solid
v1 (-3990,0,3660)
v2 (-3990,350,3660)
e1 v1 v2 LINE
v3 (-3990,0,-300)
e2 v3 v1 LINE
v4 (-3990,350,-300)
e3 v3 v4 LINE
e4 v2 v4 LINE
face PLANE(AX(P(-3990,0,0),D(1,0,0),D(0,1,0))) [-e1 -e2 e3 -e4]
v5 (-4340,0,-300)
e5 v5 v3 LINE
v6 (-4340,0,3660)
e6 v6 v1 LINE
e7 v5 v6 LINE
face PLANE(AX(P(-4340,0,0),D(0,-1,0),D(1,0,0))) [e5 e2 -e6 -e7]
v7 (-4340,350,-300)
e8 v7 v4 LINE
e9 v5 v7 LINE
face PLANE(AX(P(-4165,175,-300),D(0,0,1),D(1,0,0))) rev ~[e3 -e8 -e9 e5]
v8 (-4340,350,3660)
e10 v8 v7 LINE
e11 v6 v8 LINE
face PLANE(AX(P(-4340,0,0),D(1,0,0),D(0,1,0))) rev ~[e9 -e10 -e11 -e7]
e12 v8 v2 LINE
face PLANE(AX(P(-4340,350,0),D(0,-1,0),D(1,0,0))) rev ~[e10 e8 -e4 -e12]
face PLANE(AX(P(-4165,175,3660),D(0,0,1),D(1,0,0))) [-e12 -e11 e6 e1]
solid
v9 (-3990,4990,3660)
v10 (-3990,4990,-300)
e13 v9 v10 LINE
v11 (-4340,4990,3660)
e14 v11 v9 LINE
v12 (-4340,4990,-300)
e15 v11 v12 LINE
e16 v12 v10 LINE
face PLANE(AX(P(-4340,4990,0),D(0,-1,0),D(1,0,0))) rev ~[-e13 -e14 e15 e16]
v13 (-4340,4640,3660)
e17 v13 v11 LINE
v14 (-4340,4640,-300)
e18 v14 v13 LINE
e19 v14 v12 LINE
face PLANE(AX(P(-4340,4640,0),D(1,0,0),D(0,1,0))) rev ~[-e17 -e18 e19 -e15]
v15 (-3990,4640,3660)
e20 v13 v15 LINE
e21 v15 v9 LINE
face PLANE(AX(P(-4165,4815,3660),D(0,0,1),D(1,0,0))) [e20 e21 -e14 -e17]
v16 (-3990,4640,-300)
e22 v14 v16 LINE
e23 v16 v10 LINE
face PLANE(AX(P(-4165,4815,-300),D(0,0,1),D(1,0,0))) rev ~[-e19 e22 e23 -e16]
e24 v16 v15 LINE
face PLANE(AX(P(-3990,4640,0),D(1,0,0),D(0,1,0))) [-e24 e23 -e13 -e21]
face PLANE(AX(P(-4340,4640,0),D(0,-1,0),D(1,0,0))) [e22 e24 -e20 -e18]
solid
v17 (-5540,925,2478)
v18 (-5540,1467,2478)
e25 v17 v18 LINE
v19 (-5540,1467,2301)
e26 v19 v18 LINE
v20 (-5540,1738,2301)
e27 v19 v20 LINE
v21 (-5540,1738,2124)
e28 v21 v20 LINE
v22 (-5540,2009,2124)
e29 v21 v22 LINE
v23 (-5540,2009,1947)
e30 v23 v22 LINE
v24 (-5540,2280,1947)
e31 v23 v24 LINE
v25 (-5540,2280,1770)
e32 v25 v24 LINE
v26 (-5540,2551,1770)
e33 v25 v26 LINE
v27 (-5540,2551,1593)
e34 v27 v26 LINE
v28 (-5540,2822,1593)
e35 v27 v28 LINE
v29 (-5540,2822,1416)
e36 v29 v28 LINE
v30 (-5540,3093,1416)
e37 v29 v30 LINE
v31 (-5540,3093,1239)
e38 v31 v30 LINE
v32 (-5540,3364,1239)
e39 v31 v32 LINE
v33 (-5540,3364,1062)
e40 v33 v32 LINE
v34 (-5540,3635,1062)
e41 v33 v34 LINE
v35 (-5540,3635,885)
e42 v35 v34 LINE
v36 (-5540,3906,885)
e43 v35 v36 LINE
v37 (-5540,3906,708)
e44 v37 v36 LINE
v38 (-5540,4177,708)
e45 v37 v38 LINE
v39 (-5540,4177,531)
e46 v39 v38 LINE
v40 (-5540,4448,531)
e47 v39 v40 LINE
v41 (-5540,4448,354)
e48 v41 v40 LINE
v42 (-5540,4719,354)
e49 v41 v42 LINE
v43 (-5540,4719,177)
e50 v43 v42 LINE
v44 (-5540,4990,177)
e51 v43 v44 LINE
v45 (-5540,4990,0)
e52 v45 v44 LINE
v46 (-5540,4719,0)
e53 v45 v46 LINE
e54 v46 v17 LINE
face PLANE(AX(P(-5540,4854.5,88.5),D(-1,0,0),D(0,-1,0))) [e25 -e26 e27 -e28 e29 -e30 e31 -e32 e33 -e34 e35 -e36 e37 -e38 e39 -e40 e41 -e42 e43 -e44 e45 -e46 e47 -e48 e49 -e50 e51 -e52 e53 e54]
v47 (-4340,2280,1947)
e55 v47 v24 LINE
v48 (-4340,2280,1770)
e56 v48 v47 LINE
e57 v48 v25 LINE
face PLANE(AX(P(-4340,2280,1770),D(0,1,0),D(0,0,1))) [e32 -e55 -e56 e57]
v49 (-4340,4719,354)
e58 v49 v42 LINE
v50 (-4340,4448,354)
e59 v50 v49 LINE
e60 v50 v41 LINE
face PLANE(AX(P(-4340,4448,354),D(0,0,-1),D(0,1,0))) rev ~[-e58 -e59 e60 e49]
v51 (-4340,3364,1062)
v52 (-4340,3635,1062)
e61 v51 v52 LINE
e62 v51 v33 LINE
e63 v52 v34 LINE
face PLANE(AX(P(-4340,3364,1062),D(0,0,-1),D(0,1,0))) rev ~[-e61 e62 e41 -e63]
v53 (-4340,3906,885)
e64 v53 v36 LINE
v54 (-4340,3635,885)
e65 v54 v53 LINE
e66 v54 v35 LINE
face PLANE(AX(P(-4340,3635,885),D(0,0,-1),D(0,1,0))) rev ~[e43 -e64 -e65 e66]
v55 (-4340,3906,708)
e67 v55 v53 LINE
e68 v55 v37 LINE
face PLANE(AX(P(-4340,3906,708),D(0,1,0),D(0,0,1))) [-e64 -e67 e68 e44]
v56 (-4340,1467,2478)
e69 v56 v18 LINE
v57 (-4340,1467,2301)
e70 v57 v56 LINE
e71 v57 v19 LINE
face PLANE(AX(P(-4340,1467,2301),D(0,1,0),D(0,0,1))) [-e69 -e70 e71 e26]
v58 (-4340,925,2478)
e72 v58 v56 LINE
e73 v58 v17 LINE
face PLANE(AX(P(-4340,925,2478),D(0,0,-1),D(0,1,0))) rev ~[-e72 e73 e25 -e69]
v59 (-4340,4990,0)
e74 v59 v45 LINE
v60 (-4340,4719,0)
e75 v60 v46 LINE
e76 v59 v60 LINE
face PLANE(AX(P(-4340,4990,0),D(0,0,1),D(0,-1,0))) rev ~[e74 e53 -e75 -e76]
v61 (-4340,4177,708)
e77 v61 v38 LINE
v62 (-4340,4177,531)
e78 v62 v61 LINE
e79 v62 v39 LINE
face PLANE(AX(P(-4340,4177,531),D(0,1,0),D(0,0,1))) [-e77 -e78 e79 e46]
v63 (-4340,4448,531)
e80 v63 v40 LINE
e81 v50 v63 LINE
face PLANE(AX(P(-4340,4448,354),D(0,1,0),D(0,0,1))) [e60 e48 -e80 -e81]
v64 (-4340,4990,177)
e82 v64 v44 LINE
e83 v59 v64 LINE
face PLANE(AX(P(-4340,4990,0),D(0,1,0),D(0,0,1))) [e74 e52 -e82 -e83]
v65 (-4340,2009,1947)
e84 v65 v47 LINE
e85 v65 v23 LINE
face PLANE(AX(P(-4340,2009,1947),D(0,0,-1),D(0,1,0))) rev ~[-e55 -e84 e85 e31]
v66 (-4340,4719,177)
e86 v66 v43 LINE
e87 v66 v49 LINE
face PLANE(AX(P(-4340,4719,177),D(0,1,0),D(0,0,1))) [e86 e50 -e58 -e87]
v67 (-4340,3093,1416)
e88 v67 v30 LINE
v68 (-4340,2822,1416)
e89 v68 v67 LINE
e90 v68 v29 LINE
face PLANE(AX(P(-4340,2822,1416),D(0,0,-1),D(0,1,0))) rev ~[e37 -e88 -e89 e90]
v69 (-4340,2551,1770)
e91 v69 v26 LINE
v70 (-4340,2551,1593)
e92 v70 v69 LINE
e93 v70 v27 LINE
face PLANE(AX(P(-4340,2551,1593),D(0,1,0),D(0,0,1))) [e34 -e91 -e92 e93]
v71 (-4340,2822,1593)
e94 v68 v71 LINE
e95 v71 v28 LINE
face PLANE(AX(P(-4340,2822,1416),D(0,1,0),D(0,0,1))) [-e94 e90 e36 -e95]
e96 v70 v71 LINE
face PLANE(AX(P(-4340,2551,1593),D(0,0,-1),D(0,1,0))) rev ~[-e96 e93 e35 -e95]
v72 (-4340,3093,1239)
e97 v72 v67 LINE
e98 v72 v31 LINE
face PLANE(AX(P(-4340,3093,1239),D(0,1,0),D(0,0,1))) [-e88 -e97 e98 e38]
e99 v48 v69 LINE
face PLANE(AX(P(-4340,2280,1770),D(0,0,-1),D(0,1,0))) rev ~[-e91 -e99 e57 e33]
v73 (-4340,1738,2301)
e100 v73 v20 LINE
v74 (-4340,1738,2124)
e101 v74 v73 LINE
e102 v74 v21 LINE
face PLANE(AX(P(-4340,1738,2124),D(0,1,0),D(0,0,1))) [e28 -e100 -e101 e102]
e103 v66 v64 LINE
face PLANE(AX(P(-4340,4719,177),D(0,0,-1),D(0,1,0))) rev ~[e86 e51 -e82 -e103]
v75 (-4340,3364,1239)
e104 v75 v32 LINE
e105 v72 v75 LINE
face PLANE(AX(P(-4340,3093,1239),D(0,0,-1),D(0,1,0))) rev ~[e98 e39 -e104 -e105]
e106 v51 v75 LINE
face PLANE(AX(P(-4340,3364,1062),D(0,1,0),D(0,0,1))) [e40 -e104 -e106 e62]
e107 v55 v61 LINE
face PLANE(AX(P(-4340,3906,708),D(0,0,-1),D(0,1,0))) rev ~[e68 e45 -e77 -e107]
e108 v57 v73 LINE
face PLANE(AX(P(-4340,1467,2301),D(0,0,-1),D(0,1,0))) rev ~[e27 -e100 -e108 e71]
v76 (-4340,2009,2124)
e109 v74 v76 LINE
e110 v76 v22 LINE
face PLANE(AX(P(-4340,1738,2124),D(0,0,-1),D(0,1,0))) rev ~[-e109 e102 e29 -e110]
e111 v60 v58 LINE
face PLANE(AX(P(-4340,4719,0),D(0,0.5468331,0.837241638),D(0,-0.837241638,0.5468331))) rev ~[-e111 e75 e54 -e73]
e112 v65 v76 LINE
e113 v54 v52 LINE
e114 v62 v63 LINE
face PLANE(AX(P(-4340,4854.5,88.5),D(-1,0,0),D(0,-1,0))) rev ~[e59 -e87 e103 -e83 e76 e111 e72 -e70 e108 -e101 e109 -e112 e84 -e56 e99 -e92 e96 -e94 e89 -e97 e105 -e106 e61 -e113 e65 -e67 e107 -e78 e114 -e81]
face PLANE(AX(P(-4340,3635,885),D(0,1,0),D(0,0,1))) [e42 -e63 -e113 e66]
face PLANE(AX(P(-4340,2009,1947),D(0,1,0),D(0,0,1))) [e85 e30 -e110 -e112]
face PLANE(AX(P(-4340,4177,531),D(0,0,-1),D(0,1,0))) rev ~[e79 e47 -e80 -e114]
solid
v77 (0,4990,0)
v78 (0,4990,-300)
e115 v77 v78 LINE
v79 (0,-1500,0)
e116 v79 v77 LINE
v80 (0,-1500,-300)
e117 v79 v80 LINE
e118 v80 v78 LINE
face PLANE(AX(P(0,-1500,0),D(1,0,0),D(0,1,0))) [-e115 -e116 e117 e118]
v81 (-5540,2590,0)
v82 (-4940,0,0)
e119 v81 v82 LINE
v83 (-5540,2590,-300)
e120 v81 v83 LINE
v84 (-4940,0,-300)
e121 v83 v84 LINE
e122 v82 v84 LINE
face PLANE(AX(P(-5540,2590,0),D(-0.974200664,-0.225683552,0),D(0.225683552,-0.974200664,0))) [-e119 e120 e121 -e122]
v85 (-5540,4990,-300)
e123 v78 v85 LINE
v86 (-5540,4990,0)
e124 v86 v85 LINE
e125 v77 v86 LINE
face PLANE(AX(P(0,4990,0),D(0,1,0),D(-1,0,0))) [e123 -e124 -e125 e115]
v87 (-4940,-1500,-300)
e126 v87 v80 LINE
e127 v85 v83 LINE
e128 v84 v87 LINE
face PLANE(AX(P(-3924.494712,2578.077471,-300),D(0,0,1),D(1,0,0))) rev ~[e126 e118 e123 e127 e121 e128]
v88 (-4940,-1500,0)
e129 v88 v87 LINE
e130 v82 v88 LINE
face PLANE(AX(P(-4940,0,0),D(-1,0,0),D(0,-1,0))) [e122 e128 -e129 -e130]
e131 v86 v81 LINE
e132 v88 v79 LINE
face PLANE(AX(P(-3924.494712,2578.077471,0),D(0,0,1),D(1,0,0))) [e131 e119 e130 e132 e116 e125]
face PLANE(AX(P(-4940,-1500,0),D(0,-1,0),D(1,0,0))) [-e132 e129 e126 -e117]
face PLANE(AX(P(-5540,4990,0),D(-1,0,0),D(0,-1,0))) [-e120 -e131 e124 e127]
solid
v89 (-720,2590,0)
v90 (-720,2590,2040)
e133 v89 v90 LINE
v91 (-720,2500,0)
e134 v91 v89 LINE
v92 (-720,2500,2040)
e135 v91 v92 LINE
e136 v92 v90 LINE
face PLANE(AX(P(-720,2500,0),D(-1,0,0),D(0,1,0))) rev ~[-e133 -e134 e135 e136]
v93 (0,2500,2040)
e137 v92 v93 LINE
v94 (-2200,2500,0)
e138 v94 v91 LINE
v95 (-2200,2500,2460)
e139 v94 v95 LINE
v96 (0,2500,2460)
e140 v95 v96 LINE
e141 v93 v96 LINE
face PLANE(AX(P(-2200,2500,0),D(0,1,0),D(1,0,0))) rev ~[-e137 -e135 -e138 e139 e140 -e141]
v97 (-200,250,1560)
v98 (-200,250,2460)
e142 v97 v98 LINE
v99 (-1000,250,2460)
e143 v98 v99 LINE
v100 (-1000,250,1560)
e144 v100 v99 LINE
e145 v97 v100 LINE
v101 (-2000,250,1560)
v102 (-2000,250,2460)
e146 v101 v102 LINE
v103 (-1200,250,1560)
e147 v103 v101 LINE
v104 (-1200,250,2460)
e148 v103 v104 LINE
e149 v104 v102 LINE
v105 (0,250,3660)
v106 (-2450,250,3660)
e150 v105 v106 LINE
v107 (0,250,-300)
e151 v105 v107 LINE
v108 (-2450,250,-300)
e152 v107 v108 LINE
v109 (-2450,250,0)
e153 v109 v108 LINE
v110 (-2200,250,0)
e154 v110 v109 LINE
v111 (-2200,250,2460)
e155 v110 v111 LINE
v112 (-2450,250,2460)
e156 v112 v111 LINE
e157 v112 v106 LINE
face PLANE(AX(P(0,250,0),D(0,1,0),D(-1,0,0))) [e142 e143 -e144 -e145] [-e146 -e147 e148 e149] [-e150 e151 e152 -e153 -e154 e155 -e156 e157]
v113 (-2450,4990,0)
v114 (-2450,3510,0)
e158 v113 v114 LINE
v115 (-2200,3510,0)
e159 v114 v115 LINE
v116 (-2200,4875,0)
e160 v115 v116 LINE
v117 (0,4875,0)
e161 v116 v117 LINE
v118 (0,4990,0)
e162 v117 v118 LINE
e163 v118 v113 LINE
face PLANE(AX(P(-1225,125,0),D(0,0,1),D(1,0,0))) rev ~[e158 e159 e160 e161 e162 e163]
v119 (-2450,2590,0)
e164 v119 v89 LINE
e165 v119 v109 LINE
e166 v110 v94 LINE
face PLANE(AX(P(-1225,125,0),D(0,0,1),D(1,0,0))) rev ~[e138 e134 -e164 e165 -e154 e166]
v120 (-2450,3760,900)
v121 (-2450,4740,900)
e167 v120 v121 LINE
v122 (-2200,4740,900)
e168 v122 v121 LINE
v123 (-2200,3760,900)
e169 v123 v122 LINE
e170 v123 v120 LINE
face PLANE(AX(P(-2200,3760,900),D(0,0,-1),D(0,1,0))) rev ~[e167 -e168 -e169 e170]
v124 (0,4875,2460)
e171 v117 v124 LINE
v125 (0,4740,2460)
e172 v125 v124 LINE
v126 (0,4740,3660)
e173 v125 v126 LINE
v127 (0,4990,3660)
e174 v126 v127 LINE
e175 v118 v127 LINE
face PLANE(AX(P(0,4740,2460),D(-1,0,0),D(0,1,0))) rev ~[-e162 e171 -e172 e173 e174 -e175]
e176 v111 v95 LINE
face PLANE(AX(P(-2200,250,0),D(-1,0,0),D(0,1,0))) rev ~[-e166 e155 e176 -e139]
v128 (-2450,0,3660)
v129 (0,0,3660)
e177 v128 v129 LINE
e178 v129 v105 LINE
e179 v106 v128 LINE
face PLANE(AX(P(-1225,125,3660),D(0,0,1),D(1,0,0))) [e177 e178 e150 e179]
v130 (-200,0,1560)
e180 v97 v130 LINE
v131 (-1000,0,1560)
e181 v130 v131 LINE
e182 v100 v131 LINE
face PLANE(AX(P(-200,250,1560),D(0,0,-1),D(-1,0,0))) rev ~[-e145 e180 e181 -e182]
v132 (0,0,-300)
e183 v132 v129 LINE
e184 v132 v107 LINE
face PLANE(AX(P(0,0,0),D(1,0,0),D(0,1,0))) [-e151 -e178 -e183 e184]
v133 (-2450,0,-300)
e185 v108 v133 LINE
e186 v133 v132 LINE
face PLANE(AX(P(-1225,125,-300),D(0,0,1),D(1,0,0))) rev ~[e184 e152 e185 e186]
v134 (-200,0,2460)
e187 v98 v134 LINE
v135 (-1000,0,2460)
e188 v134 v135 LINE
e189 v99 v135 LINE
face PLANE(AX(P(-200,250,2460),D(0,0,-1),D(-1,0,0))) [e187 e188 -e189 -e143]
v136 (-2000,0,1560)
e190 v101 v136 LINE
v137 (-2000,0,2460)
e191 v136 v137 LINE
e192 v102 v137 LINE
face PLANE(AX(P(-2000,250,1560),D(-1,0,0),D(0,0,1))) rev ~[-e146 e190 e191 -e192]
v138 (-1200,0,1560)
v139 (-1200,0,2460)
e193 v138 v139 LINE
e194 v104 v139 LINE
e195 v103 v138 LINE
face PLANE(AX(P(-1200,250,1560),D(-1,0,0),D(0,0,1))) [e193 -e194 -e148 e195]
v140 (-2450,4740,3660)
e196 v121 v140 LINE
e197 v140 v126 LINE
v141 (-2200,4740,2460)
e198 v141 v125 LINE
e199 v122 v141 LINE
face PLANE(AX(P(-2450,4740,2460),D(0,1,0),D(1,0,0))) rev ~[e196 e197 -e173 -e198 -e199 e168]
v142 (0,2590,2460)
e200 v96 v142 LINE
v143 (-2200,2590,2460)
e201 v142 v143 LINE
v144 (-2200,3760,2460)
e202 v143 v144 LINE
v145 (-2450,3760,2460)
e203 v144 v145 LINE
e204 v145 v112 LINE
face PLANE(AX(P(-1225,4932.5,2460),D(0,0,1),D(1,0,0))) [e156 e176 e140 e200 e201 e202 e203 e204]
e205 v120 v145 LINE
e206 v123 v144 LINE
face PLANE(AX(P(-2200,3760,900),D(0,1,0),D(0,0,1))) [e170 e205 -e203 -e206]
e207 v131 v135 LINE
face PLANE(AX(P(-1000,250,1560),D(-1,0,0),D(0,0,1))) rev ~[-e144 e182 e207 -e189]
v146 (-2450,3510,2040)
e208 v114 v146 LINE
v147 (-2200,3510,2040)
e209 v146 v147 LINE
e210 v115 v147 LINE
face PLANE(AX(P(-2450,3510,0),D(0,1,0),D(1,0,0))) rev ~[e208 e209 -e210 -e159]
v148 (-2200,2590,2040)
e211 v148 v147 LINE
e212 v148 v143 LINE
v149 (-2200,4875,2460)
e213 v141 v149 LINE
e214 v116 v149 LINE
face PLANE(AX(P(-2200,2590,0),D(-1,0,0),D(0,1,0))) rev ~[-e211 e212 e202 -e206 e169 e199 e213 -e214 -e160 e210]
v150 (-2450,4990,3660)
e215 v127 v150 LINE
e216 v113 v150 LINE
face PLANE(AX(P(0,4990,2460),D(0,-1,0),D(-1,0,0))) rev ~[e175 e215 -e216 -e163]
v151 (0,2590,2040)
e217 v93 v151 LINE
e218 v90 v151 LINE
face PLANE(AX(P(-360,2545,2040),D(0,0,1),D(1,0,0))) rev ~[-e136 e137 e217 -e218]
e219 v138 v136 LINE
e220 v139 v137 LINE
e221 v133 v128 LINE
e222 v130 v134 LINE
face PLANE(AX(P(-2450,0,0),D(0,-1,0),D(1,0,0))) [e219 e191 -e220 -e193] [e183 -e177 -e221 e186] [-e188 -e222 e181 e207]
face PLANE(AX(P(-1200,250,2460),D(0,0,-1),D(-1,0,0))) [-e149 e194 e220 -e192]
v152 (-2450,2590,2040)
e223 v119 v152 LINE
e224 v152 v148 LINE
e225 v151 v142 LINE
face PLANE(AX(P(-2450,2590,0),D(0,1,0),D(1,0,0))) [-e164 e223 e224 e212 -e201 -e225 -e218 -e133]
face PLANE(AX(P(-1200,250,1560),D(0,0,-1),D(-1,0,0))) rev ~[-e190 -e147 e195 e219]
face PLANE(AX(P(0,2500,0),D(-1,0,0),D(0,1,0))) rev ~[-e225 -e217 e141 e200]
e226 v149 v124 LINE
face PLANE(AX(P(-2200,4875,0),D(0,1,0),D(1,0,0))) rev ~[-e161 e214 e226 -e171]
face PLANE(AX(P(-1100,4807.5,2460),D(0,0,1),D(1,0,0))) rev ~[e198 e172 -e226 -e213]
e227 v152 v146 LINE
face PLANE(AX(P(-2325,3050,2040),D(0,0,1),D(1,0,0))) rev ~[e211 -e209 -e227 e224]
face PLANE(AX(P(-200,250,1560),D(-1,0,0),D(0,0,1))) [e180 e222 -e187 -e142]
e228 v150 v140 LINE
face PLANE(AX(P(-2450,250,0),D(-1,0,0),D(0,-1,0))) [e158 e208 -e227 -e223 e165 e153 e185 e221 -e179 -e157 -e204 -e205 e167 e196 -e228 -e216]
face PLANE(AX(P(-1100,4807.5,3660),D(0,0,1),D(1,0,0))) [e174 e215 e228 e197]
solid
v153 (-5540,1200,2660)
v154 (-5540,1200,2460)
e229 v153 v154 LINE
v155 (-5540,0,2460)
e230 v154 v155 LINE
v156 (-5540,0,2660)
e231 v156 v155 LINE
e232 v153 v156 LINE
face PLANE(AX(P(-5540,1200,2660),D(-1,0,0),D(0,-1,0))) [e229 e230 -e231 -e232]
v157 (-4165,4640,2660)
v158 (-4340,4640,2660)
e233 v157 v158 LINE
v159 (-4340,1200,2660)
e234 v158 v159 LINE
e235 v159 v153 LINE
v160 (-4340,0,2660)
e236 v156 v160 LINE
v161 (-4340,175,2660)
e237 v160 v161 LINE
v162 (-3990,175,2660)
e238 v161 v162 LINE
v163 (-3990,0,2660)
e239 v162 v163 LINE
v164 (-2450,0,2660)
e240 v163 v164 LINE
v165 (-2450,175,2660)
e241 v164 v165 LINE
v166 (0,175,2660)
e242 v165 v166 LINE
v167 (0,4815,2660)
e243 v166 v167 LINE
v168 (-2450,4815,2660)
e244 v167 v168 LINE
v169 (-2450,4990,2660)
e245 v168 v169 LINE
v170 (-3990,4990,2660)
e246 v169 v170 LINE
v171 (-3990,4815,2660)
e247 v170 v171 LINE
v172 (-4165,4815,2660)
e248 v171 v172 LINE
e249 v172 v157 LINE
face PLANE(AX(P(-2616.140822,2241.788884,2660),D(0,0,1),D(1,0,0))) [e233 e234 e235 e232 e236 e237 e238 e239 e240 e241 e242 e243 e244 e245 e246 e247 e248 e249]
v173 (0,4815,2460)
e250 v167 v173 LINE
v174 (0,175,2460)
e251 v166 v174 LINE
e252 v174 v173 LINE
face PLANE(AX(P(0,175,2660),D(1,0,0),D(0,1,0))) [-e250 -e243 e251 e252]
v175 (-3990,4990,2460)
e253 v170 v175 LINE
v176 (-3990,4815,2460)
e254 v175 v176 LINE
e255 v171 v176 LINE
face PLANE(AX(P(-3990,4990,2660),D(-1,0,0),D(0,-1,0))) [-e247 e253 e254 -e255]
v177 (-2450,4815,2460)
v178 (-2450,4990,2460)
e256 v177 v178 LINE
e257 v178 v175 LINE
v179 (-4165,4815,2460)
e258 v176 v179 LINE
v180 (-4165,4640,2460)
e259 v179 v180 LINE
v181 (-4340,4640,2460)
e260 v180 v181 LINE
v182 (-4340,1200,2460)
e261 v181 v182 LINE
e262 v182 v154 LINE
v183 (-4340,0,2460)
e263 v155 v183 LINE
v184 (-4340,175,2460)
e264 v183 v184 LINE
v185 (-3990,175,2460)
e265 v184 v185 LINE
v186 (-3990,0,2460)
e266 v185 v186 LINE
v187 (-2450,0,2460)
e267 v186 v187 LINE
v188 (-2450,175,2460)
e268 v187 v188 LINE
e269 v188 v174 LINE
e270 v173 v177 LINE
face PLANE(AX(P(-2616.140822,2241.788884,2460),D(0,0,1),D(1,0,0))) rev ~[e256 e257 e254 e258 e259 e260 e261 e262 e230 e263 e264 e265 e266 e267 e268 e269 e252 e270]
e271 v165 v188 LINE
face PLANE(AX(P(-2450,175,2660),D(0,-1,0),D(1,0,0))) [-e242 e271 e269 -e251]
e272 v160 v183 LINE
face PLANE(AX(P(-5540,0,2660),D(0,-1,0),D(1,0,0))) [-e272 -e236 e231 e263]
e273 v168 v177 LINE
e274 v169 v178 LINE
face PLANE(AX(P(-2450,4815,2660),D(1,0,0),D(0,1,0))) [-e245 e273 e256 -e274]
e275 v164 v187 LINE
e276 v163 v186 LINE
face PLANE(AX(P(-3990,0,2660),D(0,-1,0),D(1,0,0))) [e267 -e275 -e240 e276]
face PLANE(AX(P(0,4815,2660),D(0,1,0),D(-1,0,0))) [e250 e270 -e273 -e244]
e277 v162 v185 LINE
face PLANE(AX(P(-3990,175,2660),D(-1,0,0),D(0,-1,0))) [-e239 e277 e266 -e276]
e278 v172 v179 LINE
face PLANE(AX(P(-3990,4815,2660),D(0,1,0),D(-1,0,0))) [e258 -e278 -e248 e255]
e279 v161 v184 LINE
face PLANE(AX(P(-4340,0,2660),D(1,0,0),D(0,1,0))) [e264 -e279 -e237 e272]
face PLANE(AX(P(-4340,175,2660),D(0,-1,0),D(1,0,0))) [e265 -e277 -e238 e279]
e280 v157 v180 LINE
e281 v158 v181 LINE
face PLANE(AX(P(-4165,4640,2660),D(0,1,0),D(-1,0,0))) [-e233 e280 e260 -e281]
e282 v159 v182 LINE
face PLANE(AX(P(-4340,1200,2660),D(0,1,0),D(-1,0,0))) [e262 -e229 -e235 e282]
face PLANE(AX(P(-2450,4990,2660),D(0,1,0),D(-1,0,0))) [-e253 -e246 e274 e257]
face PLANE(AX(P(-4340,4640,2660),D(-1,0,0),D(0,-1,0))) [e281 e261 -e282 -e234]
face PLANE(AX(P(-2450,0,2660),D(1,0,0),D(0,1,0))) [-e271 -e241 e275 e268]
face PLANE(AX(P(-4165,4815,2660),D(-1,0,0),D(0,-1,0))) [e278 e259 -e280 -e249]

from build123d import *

# Parameters (mm, degrees)
F2_W          = 1480
F2_H          = 90
F2_W_2        = 350
F2_H_2        = 350
F2_W_3        = 250
F2_H_3        = 920
F2_H_4        = 135
F2_H_5        = 1230
F2_W_4        = 720
F3_DEPTH      = 300
F5_DEPTH      = 200
F6_DEPTH      = 2460
F7_START      = 2460
F7_DEPTH      = 1200
F8_DEPTH      = 3660
F8_DEPTH_BACK = 300
F9_W          = 271
F9_H          = 177
F10_DEPTH     = 1200
F11_DEPTH     = 2040
F12_W         = 800
F12_H         = 900
F13_DEPTH     = 250
F14_W         = 980
F14_H         = 1560
F15_DEPTH     = 250


# Not quite as in the source:
# - a feature names something its author has since deleted; it is built from what else it names


with BuildPart() as f3:
    # F2 (on Top) → F3 (new body)
    with BuildSketch(Plane.XY):
        Polygon((-4340, 4990), (-5540, 4990), (-5540, 2590), (-4940, 0), (-4340, 0), (-4340, 350), (-3990, 350), (-3990, 0), (-2450, 0), (-2450, 250), (-2450, 2590), (-2450, 3510), (-2450, 4740), (-2450, 4875), (-2450, 4990), (-3990, 4990), (-3990, 4640), (-4340, 4640), align=None)
        with Locations((-1460, 2545)):
            Rectangle(F2_W, F2_H)
        Polygon((-4340, 0), (-4940, 0), (-4940, -1500), (0, -1500), (0, 0), (-2450, 0), (-3990, 0), align=None)
        Polygon((0, 4990), (-2450, 4990), (-2450, 4875), (-2200, 4875), (-1229.6366691589, 4875), (0, 4875), align=None)
        with Locations((-4165, 4815)):
            Rectangle(F2_W_2, F2_H_2)
        with Locations((-4165, 175)):
            Rectangle(F2_W_2, F2_H_2)
        Polygon((-2200, 250), (0, 250), (0, 2500), (-720, 2500), (-2200, 2500), align=None)
        Polygon((-2450, 250), (-2450, 0), (0, 0), (0, 250), (-2200, 250), align=None)
        with Locations((-2325, 3050)):
            Rectangle(F2_W_3, F2_H_3)
        Polygon((0, 4740), (0, 4875), (-1229.6366691589, 4875), (-2200, 4875), (-2200, 4740), align=None)
        with Locations((-2325, 4807.5)):
            Rectangle(F2_W_3, F2_H_4)
        Polygon((-2450, 2590), (-2450, 250), (-2200, 250), (-2200, 2500), (-2200, 2590), align=None)
        with Locations((-2325, 4125)):
            Rectangle(F2_W_3, F2_H_5)
        Polygon((0, 2590), (0, 4740), (-2200, 4740), (-2200, 3510), (-2200, 2590), (-720, 2590), align=None)
        with Locations((-360, 2545)):
            Rectangle(F2_W_4, F2_H)
    extrude(amount=-F3_DEPTH)


with BuildPart() as f5:
    # F4 (on offset) → F5 (new body)
    with BuildSketch(Plane.XY.offset(2660)):
        Polygon((-4340, 1200), (-5540, 1200), (-5540, 0), (-4340, 0), (-4340, 175), (-3990, 175), (-3990, 0), (-2450, 0), (-2450, 175), (0, 175), (0, 4815), (-2450, 4815), (-2450, 4990), (-3990, 4990), (-3990, 4815), (-4165, 4815), (-4165, 4640), (-4340, 4640), align=None)
    extrude(amount=-F5_DEPTH)


with BuildPart() as f6:
    # F2 (on Top) → F6 (new body, through all)
    with BuildSketch(Plane.XY):
        Polygon((0, 4990), (-2450, 4990), (-2450, 4875), (-2200, 4875), (-1229.6366691589, 4875), (0, 4875), align=None)
        with Locations((-2325, 4807.5)):
            Rectangle(F2_W_3, F2_H_4)
        with Locations((-2325, 3050)):
            Rectangle(F2_W_3, F2_H_3)
        with Locations((-1460, 2545)):
            Rectangle(F2_W, F2_H)
        Polygon((-2450, 2590), (-2450, 250), (-2200, 250), (-2200, 2500), (-2200, 2590), align=None)
        with Locations((-2325, 4125)):
            Rectangle(F2_W_3, F2_H_5)
        with Locations((-360, 2545)):
            Rectangle(F2_W_4, F2_H)
    extrude(amount=F6_DEPTH)

    # F2 (on Top) → F7 (join)
    with BuildSketch(Plane.XY.offset(F7_START)):
        Polygon((0, 4740), (0, 4875), (-1229.6366691589, 4875), (-2200, 4875), (-2200, 4740), align=None)
        Polygon((0, 4990), (-2450, 4990), (-2450, 4875), (-2200, 4875), (-1229.6366691589, 4875), (0, 4875), align=None)
        with Locations((-2325, 4807.5)):
            Rectangle(F2_W_3, F2_H_4)
    extrude(amount=F7_DEPTH)

    # F2 (on Top) → F8 (join, two sides)
    with BuildSketch(Plane.XY) as f8_sk:
        Polygon((-2450, 250), (-2450, 0), (0, 0), (0, 250), (-2200, 250), align=None)
    extrude(amount=F8_DEPTH)
    extrude(f8_sk.sketch, amount=-F8_DEPTH_BACK)

    # F2 (on Top) → F11 (cut)
    with BuildSketch(Plane.XY):
        with Locations((-2325, 3050)):
            Rectangle(F2_W_3, F2_H_3)
        with Locations((-360, 2545)):
            Rectangle(F2_W_4, F2_H)
    extrude(amount=F11_DEPTH, mode=Mode.SUBTRACT)

    # F12 (on face) → F13 (cut, through all)
    with BuildSketch(Plane(origin=(0, 250, 0), x_dir=(-1, 0, 0), z_dir=(0, 1, 0))):
        with Locations((600, 2010)):
            Rectangle(F12_W, F12_H)
        with Locations((1600, 2010)):
            Rectangle(F12_W, F12_H)
    extrude(amount=-F13_DEPTH, mode=Mode.SUBTRACT)

    # F14 (on face) → F15 (cut, through all)
    with BuildSketch(Plane.YZ.offset(-2200)):
        with Locations((4250, 1680)):
            Rectangle(F14_W, F14_H)
    extrude(amount=-F15_DEPTH, mode=Mode.SUBTRACT)


with BuildPart() as f8:
    # F2 (on Top) → F8, piece 2 (new body, two sides)
    with BuildSketch(Plane.XY) as f8_2_sk:
        with Locations((-4165, 175)):
            Rectangle(F2_W_2, F2_H_2)
    extrude(amount=F8_DEPTH)
    extrude(f8_2_sk.sketch, amount=-F8_DEPTH_BACK)


with BuildPart() as f8b:
    # F2 (on Top) → F8, piece 3 (new body, two sides)
    with BuildSketch(Plane.XY) as f8_3_sk:
        with Locations((-4165, 4815)):
            Rectangle(F2_W_2, F2_H_2)
    extrude(amount=F8_DEPTH)
    extrude(f8_3_sk.sketch, amount=-F8_DEPTH_BACK)


with BuildPart() as f10:
    # F9 (on face) → F10 (new body)
    with BuildSketch(Plane(origin=(-4340, 0, 0), x_dir=(0, -1, 0), z_dir=(-1, 0, 0))):
        with Locations((-4854.5, 88.5)):
            Rectangle(F9_W, F9_H)
        Polygon((-4719, 177), (-4719, 0), (-4448, 177), align=None)
        with Locations((-4583.5, 265.5)):
            Rectangle(F9_W, F9_H)
        Polygon((-4448, 354), (-4448, 177), (-4177, 354), align=None)
        with Locations((-4312.5, 442.5)):
            Rectangle(F9_W, F9_H)
        Polygon((-4177, 531), (-4177, 354), (-3906, 531), align=None)
        with Locations((-4041.5, 619.5)):
            Rectangle(F9_W, F9_H)
        Polygon((-3906, 708), (-3906, 531), (-3635, 708), align=None)
        with Locations((-3770.5, 796.5)):
            Rectangle(F9_W, F9_H)
        Polygon((-3635, 885), (-3635, 708), (-3364, 885), align=None)
        with Locations((-3499.5, 973.5)):
            Rectangle(F9_W, F9_H)
        Polygon((-3364, 1062), (-3364, 885), (-3093, 1062), align=None)
        with Locations((-3228.5, 1150.5)):
            Rectangle(F9_W, F9_H)
        Polygon((-3093, 1239), (-3093, 1062), (-2822, 1239), align=None)
        with Locations((-2957.5, 1327.5)):
            Rectangle(F9_W, F9_H)
        Polygon((-2822, 1416), (-2822, 1239), (-2551, 1416), align=None)
        with Locations((-2686.5, 1504.5)):
            Rectangle(F9_W, F9_H)
        Polygon((-2551, 1593), (-2551, 1416), (-2280, 1593), align=None)
        with Locations((-2415.5, 1681.5)):
            Rectangle(F9_W, F9_H)
        Polygon((-2280, 1770), (-2280, 1593), (-2009, 1770), align=None)
        with Locations((-2144.5, 1858.5)):
            Rectangle(F9_W, F9_H)
        Polygon((-2009, 1947), (-2009, 1770), (-1738, 1947), align=None)
        with Locations((-1873.5, 2035.5)):
            Rectangle(F9_W, F9_H)
        Polygon((-1738, 2124), (-1738, 1947), (-1467, 2124), align=None)
        with Locations((-1602.5, 2212.5)):
            Rectangle(F9_W, F9_H)
        Polygon((-1467, 2301), (-1467, 2124), (-1196, 2301), align=None)
        with Locations((-1331.5, 2389.5)):
            Rectangle(F9_W, F9_H)
        Polygon((-1196, 2478), (-1196, 2301), (-925, 2478), align=None)
    extrude(amount=F10_DEPTH)


solid = Compound([f3.part, f5.part, f6.part, f8.part, f8b.part, f10.part])
